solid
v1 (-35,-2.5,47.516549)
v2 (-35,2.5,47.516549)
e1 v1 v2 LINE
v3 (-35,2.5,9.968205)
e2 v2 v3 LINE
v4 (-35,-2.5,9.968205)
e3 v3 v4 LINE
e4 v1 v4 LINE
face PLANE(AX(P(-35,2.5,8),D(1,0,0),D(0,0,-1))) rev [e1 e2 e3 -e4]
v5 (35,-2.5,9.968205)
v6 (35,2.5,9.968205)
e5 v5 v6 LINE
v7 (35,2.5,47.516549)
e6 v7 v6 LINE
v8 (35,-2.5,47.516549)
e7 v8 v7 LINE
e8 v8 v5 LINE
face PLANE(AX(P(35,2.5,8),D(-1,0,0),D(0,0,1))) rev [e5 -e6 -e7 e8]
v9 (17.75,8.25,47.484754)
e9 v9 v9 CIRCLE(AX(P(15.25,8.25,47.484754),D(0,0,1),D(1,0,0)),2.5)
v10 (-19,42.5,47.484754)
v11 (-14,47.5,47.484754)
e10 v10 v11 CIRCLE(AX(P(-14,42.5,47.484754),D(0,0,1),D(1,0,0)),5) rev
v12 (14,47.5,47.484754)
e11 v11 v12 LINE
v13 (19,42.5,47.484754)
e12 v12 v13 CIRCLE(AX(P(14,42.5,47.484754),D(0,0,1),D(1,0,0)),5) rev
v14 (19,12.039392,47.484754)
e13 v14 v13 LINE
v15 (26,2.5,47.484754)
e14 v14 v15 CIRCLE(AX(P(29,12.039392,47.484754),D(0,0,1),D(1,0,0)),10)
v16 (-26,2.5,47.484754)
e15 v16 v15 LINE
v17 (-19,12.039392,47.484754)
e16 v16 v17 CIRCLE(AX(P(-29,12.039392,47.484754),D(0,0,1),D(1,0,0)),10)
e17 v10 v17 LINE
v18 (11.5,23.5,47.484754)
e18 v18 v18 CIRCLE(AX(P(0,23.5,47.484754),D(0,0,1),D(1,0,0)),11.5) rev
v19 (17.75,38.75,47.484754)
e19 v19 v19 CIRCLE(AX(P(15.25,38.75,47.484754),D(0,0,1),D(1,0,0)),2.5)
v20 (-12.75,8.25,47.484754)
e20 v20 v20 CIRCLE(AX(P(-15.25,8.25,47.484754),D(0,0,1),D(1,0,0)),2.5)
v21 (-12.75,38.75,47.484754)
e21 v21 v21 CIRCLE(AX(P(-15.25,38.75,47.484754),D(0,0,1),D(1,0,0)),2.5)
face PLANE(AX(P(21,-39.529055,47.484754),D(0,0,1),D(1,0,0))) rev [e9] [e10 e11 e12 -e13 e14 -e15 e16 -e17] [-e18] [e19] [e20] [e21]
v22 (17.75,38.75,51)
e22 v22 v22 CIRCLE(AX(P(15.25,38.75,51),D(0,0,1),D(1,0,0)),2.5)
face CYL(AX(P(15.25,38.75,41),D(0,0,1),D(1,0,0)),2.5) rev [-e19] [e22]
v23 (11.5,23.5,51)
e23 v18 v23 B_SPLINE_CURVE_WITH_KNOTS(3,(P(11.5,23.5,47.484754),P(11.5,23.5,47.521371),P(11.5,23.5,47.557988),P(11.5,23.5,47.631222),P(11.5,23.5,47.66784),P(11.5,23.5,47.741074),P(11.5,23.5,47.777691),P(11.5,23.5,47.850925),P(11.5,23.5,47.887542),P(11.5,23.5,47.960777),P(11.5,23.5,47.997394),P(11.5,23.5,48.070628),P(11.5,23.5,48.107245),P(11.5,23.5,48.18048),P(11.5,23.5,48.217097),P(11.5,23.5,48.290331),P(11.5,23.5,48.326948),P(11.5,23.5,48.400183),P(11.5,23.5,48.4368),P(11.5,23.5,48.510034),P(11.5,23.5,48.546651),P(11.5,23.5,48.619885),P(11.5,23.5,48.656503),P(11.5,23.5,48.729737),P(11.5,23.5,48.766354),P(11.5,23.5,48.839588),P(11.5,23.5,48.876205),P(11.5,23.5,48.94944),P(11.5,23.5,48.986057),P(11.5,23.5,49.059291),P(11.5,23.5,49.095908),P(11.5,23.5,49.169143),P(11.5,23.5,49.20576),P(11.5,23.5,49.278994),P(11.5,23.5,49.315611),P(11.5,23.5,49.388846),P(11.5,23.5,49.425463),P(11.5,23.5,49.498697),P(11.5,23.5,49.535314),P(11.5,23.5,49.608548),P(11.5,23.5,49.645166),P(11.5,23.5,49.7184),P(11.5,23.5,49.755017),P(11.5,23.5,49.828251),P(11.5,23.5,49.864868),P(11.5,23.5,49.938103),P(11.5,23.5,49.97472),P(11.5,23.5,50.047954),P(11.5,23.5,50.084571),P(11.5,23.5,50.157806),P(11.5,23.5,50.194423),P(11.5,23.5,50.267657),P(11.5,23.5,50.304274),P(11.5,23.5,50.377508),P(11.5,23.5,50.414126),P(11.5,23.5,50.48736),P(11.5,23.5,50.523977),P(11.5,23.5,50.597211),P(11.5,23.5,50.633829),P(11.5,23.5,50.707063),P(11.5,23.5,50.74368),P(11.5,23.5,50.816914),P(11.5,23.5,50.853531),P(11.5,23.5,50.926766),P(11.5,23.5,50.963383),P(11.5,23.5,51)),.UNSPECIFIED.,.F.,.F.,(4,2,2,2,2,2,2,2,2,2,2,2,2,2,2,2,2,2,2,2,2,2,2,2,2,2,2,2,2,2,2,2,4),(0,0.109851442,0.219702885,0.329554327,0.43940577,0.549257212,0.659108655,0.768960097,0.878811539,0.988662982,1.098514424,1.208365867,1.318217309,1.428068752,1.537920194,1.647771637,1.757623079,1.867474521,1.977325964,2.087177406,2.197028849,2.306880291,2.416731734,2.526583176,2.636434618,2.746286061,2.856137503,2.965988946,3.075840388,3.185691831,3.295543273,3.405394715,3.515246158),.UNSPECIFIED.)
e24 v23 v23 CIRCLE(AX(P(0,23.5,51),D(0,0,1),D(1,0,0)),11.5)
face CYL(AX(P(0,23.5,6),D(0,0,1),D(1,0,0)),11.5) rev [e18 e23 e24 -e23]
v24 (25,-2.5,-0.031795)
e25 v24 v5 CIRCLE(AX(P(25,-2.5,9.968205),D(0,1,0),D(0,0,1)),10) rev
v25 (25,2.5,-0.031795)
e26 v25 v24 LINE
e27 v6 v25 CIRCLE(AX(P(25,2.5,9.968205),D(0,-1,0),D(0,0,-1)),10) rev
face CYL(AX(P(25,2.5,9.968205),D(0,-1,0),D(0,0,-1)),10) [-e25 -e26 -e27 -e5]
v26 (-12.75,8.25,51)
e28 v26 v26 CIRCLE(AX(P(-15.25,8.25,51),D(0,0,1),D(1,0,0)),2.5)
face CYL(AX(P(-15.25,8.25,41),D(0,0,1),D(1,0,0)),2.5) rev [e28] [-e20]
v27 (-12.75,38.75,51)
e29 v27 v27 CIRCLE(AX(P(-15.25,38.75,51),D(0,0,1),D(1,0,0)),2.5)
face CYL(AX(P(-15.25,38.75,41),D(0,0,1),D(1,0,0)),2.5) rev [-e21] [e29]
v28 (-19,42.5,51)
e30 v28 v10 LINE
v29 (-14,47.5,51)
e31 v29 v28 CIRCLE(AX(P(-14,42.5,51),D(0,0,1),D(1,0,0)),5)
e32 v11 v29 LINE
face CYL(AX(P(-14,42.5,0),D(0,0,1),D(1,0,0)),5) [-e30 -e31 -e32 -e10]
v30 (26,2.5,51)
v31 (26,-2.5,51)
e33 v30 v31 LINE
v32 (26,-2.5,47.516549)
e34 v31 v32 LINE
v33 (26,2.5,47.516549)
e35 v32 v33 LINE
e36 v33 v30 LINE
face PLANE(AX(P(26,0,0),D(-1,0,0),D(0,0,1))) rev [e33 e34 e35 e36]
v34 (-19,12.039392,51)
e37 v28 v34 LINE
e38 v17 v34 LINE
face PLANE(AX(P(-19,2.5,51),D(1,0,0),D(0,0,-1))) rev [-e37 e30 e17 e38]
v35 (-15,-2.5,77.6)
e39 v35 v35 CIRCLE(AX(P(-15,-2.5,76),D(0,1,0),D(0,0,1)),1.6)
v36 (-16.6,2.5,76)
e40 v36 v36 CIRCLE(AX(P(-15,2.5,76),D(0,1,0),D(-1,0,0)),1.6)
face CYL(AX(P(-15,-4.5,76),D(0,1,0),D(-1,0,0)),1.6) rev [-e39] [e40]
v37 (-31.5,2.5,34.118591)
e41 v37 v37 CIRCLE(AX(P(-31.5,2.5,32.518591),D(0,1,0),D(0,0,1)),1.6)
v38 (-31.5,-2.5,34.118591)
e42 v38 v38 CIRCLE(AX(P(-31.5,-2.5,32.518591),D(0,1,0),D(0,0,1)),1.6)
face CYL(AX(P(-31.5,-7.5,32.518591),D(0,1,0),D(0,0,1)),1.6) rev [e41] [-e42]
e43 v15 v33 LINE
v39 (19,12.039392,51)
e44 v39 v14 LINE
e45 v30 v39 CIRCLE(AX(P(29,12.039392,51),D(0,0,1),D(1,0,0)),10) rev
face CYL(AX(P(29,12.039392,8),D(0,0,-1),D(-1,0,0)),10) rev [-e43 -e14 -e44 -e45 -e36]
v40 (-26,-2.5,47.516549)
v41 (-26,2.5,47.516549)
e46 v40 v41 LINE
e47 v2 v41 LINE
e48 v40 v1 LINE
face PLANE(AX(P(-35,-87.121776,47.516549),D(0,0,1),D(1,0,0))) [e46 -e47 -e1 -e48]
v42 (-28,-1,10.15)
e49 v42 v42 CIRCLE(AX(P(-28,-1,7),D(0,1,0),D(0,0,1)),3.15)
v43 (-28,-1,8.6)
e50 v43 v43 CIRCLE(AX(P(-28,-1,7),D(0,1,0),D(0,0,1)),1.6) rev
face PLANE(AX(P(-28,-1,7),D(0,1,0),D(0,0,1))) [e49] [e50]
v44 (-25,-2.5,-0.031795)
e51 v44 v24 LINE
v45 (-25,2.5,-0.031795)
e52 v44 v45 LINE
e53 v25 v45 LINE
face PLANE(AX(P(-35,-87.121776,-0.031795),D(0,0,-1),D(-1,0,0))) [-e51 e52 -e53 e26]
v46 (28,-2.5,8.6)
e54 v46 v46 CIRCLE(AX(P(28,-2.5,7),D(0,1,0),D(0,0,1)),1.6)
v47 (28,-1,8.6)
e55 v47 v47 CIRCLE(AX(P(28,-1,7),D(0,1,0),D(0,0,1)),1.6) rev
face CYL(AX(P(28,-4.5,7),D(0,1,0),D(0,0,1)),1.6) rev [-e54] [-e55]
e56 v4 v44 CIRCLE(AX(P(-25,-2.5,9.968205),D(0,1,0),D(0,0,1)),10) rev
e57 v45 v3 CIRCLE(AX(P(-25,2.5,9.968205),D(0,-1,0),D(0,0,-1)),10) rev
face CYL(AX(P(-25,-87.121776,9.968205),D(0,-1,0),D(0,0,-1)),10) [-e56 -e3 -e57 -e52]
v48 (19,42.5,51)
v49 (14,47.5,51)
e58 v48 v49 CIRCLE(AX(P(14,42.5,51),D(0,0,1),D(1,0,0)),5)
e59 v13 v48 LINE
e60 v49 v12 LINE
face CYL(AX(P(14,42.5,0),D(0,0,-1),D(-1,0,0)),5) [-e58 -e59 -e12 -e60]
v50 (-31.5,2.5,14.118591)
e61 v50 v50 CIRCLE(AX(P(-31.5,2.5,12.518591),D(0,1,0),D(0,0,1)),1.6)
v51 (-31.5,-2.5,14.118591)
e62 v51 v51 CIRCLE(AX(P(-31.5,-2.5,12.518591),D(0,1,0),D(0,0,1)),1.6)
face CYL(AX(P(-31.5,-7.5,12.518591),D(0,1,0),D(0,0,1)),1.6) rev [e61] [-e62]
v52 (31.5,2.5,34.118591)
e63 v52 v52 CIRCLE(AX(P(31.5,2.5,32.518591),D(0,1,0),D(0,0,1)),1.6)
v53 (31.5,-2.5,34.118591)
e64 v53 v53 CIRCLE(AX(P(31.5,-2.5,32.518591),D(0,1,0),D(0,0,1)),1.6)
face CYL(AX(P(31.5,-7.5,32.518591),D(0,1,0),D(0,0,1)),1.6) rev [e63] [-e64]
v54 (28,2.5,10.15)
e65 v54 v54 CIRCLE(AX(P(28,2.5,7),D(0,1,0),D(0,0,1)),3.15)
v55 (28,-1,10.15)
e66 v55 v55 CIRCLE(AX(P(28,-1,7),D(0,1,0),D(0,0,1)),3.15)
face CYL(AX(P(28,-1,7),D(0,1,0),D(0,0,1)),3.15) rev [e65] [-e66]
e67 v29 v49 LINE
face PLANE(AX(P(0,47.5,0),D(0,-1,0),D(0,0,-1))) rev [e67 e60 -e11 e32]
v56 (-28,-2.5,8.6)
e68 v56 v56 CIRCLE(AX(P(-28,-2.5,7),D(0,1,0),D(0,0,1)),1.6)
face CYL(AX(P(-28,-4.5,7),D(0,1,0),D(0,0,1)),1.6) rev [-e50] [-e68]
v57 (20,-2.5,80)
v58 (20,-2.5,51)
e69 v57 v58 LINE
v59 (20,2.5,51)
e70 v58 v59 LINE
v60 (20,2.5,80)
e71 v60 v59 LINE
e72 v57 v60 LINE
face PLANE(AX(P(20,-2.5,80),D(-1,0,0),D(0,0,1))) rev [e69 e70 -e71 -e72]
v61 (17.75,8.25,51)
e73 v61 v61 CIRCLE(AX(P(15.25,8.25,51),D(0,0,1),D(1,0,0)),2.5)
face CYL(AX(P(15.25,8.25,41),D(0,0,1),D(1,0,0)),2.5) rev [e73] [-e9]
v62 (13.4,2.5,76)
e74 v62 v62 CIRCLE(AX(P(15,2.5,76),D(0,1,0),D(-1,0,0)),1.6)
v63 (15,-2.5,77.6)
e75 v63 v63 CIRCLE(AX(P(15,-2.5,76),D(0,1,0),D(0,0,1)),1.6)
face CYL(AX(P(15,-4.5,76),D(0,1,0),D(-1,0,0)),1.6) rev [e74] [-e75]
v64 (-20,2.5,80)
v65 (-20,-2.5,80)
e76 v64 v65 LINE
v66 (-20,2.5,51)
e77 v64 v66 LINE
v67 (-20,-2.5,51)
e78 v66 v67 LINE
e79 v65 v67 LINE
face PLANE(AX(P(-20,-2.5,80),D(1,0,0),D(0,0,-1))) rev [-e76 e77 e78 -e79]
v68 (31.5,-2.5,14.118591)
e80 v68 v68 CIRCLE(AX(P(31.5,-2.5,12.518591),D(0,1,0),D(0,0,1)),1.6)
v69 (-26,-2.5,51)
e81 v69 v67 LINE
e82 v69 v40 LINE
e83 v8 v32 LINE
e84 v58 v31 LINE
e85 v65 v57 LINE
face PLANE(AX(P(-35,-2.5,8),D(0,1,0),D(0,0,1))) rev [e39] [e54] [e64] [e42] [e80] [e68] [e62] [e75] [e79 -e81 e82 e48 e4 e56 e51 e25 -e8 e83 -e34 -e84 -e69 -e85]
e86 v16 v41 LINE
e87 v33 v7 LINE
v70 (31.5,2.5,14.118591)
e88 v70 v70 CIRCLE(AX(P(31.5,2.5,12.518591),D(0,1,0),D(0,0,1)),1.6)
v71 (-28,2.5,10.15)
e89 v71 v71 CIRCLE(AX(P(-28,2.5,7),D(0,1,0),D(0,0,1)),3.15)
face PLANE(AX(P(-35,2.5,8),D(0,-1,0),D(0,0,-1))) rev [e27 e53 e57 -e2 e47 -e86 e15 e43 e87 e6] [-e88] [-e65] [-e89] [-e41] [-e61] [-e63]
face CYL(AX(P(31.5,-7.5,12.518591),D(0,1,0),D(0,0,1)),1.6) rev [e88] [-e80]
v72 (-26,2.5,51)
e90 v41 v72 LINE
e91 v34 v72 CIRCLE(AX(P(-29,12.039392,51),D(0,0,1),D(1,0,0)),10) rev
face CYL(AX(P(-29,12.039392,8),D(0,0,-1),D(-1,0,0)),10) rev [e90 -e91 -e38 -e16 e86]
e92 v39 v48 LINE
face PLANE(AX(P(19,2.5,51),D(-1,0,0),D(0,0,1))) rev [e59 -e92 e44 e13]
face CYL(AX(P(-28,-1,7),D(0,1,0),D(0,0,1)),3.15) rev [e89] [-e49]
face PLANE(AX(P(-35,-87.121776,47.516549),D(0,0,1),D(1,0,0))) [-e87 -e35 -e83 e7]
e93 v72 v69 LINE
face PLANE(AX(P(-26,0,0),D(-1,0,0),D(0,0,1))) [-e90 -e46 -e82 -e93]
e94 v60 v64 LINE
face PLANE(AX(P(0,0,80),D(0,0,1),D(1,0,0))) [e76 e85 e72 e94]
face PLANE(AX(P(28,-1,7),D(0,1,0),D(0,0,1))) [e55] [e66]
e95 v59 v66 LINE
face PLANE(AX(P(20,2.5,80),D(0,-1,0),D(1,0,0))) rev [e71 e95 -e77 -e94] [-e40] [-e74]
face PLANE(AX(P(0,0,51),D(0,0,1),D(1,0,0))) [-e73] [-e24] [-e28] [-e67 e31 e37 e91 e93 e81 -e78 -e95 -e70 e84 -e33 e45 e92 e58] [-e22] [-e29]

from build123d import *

# Parameters (mm, degrees)
SKETCH_1_W           = 70
SKETCH_1_H           = 5
EXTRUDE_1_DEPTH      = 8
SKETCH_3_W           = 38
SKETCH_3_H           = 5
EXTRUDE_2_DEPTH      = 43
SKETCH_4_W           = 38
SKETCH_4_H           = 5
EXTRUDE_3_DEPTH      = 45
SKETCH_5_R           = 11.5
SKETCH_5_R_2         = 1.6
CUT_EXTRUDE_2_DEPTH  = 45
FILLET_1_R           = 5
CUT_EXTRUDE_3_REACH  = 81.536
SKETCH_6_W           = 42
SKETCH_6_H           = 1.562526182
EXTRUDE_4_DEPTH      = 7
EXTRUDE_4_DEPTH_BACK = 45
SKETCH_7_W           = 13.004753842
SKETCH_7_H           = 5
FILLET_2_R           = 10
SKETCH_13_W          = 70
SKETCH_13_H          = 47.548344346
EXTRUDE_6_DEPTH      = 5
SKETCH_10_R          = 2.5
CUT_EXTRUDE_6_DEPTH  = 10
SKETCH_11_W          = 40
SKETCH_11_H          = 5
EXTRUDE_5_DEPTH      = 29
SKETCH_12_R          = 1.6
CUT_EXTRUDE_7_DEPTH  = 7
SKETCH_14_R          = 1.6
CUT_EXTRUDE_8_DEPTH  = 7
SKETCH_15_R          = 3.15
CUT_EXTRUDE_9_DEPTH  = 3.5
FILLET_3_R           = 10
SKETCH_16_R          = 1.6
CUT_EXTRUDE_10_DEPTH = 10


with BuildPart() as part:
    # 草图1 → 凸台-拉伸1 (new body)
    with BuildSketch(Plane.XY):
        Rectangle(SKETCH_1_W, SKETCH_1_H)
    extrude(amount=EXTRUDE_1_DEPTH)

    # 草图3 → 凸台-拉伸2 (add)
    with BuildSketch(Plane.XY.offset(8)):
        Rectangle(SKETCH_3_W, SKETCH_3_H)
    extrude(amount=EXTRUDE_2_DEPTH)

    # 草图4 → 凸台-拉伸3 (add)
    with BuildSketch(Plane(origin=(0, 2.5, 0), x_dir=(1, 0, 0), z_dir=(0, 1, 0))):
        with Locations((0, -48.5)):
            Rectangle(SKETCH_4_W, SKETCH_4_H)
    extrude(amount=EXTRUDE_3_DEPTH)

    # 草图5 → 切除-拉伸2 (cut)
    with BuildSketch(Plane.XY.offset(51)):
        with Locations((0, 23.5)):
            Circle(SKETCH_5_R)
        with Locations((-15.25, 38.75)):
            Circle(SKETCH_5_R_2)
        with Locations((15.25, 38.75)):
            Circle(SKETCH_5_R_2)
        with Locations((-15.25, 8.25)):
            Circle(SKETCH_5_R_2)
        with Locations((15.25, 8.25)):
            Circle(SKETCH_5_R_2)
    extrude(amount=-CUT_EXTRUDE_2_DEPTH, mode=Mode.SUBTRACT)

    # 圆角1
    fillet_1_edges = [part.edges().sort_by_distance(p)[0] for p in [
        (-19, 47.5, 48.5),
        (19, 47.5, 48.5),
    ]]
    fillet(fillet_1_edges, radius=FILLET_1_R)

    # 切除-拉伸3: up to this face of the body (flat: up to its plane)
    cut_extrude_3_end = Plane(part.part.faces().sort_by_distance((0, 2.5, 20.572854291))[0])
    # 草图6 → 切除-拉伸3 (cut, up to the picked face)
    with BuildSketch(Plane(origin=(0, 47.5, 0), x_dir=(1, 0, 0), z_dir=(0, 1, 0)), mode=Mode.PRIVATE) as cut_extrude_3_sk1:
        with Locations((0, -46.703490751)):
            Rectangle(SKETCH_6_W, SKETCH_6_H)
    cut_extrude_3_tool1 = split(extrude(cut_extrude_3_sk1.sketch, amount=-CUT_EXTRUDE_3_REACH, mode=Mode.PRIVATE), bisect_by=cut_extrude_3_end, keep=Keep.BOTH, mode=Mode.PRIVATE)
    add(cut_extrude_3_tool1.solids().sort_by(Axis((0, 47.5, 46.703491), (0, -1, 0)))[0], mode=Mode.SUBTRACT)

    # 草图7 → 凸台-拉伸4 (add, two sides: drawn at the far end of the back side and taken through both)
    with BuildSketch(Plane(origin=(19, 0, 0), x_dir=(0, 0, -1), z_dir=(1, 0, 0)).offset(-EXTRUDE_4_DEPTH_BACK)):
        with Locations((-44.497623079, 0)):
            Rectangle(SKETCH_7_W, SKETCH_7_H)
    extrude(amount=EXTRUDE_4_DEPTH + EXTRUDE_4_DEPTH_BACK)

    # 圆角2
    # the kernel refuses this fillet: 10 mm, written as the material it adds along each edge
    with BuildSketch(Plane(origin=(-19, 2.5, 47.484753842), x_dir=(-1, 0, 0), z_dir=(0, 0, 1)), Plane(origin=(19, 2.5, 51), x_dir=(1, 0, 0), z_dir=(0, 0, -1))) as fillet_2_piece_1:
        with BuildLine():
            CenterArc((10, -9.539392014), FILLET_2_R, 107.457603124, 72.542396876)
            Line((0, -9.539392014), (-0.2, -9.539392014))
            Line((-0.2, -9.539392014), (-0.2, 0))
            Line((-0.2, 0), (0, 0.2))
            ThreePointArc((0, 0.2), (3.5, 0.2), (6.94, 0.19078784))
            Line((6.94, 0.19078784), (7, 0))
        make_face()
    extrude(amount=3.515246158)

    # 草图13 → 凸台-拉伸6 (add)
    with BuildSketch(Plane(origin=(0, 2.5, 0), x_dir=(1, 0, 0), z_dir=(0, 1, 0))):
        with Locations((0, -23.742376921)):
            Rectangle(SKETCH_13_W, SKETCH_13_H)
    extrude(amount=-EXTRUDE_6_DEPTH)

    # 草图10 → 切除-拉伸6 (cut)
    with BuildSketch(Plane.XY.offset(51)):
        with Locations((-15.25, 38.75)):
            Circle(SKETCH_10_R)
        with Locations((15.25, 38.75)):
            Circle(SKETCH_10_R)
        with Locations((15.25, 8.25)):
            Circle(SKETCH_10_R)
        with Locations((-15.25, 8.25)):
            Circle(SKETCH_10_R)
    extrude(amount=-CUT_EXTRUDE_6_DEPTH, mode=Mode.SUBTRACT)

    # 草图11 → 凸台-拉伸5 (add)
    with BuildSketch(Plane.XY.offset(51)):
        Rectangle(SKETCH_11_W, SKETCH_11_H)
    extrude(amount=EXTRUDE_5_DEPTH)

    # 草图12 → 切除-拉伸7 (cut)
    with BuildSketch(Plane(origin=(0, 2.5, 0), x_dir=(1, 0, 0), z_dir=(0, 1, 0))):
        with Locations(Location((15, -76, 0), (0, 0, 180))):
            Circle(SKETCH_12_R)
        with Locations(Location((-15, -76, 0), (0, 0, 180))):
            Circle(SKETCH_12_R)
    extrude(amount=-CUT_EXTRUDE_7_DEPTH, mode=Mode.SUBTRACT)

    # 草图14 → 切除-拉伸8 (cut)
    with BuildSketch(Plane(origin=(0, 2.5, 0), x_dir=(1, 0, 0), z_dir=(0, 1, 0))):
        with Locations(Location((28, -7, 0), (0, 0, 270))):
            Circle(SKETCH_14_R)
        with Locations(Location((-28, -7, 0), (0, 0, 270))):
            Circle(SKETCH_14_R)
    extrude(amount=-CUT_EXTRUDE_8_DEPTH, mode=Mode.SUBTRACT)

    # 草图15 → 切除-拉伸9 (cut)
    with BuildSketch(Plane(origin=(0, 2.5, 0), x_dir=(1, 0, 0), z_dir=(0, 1, 0))):
        with Locations(Location((28, -7, 0), (0, 0, 270))):
            Circle(SKETCH_15_R)
        with Locations(Location((-28, -7, 0), (0, 0, 270))):
            Circle(SKETCH_15_R)
    extrude(amount=-CUT_EXTRUDE_9_DEPTH, mode=Mode.SUBTRACT)

    # 圆角3
    fillet_3_edges = [part.edges().sort_by_distance(p)[0] for p in [
        (35, 0, -0.031795252),
        (-35, 0, -0.031795252),
    ]]
    fillet(fillet_3_edges, radius=FILLET_3_R)

    # 草图16 → 切除-拉伸10 (cut)
    with BuildSketch(Plane(origin=(0, 2.5, 0), x_dir=(1, 0, 0), z_dir=(0, 1, 0))):
        with Locations(Location((31.5, -32.518590997, 0), (0, 0, 270))):
            Circle(SKETCH_16_R)
        with Locations(Location((31.5, -12.518590997, 0), (0, 0, 270))):
            Circle(SKETCH_16_R)
        with Locations(Location((-31.5, -32.518590997, 0), (0, 0, 270))):
            Circle(SKETCH_16_R)
        with Locations(Location((-31.5, -12.518590997, 0), (0, 0, 270))):
            Circle(SKETCH_16_R)
    extrude(amount=-CUT_EXTRUDE_10_DEPTH, mode=Mode.SUBTRACT)


solid = part.part
